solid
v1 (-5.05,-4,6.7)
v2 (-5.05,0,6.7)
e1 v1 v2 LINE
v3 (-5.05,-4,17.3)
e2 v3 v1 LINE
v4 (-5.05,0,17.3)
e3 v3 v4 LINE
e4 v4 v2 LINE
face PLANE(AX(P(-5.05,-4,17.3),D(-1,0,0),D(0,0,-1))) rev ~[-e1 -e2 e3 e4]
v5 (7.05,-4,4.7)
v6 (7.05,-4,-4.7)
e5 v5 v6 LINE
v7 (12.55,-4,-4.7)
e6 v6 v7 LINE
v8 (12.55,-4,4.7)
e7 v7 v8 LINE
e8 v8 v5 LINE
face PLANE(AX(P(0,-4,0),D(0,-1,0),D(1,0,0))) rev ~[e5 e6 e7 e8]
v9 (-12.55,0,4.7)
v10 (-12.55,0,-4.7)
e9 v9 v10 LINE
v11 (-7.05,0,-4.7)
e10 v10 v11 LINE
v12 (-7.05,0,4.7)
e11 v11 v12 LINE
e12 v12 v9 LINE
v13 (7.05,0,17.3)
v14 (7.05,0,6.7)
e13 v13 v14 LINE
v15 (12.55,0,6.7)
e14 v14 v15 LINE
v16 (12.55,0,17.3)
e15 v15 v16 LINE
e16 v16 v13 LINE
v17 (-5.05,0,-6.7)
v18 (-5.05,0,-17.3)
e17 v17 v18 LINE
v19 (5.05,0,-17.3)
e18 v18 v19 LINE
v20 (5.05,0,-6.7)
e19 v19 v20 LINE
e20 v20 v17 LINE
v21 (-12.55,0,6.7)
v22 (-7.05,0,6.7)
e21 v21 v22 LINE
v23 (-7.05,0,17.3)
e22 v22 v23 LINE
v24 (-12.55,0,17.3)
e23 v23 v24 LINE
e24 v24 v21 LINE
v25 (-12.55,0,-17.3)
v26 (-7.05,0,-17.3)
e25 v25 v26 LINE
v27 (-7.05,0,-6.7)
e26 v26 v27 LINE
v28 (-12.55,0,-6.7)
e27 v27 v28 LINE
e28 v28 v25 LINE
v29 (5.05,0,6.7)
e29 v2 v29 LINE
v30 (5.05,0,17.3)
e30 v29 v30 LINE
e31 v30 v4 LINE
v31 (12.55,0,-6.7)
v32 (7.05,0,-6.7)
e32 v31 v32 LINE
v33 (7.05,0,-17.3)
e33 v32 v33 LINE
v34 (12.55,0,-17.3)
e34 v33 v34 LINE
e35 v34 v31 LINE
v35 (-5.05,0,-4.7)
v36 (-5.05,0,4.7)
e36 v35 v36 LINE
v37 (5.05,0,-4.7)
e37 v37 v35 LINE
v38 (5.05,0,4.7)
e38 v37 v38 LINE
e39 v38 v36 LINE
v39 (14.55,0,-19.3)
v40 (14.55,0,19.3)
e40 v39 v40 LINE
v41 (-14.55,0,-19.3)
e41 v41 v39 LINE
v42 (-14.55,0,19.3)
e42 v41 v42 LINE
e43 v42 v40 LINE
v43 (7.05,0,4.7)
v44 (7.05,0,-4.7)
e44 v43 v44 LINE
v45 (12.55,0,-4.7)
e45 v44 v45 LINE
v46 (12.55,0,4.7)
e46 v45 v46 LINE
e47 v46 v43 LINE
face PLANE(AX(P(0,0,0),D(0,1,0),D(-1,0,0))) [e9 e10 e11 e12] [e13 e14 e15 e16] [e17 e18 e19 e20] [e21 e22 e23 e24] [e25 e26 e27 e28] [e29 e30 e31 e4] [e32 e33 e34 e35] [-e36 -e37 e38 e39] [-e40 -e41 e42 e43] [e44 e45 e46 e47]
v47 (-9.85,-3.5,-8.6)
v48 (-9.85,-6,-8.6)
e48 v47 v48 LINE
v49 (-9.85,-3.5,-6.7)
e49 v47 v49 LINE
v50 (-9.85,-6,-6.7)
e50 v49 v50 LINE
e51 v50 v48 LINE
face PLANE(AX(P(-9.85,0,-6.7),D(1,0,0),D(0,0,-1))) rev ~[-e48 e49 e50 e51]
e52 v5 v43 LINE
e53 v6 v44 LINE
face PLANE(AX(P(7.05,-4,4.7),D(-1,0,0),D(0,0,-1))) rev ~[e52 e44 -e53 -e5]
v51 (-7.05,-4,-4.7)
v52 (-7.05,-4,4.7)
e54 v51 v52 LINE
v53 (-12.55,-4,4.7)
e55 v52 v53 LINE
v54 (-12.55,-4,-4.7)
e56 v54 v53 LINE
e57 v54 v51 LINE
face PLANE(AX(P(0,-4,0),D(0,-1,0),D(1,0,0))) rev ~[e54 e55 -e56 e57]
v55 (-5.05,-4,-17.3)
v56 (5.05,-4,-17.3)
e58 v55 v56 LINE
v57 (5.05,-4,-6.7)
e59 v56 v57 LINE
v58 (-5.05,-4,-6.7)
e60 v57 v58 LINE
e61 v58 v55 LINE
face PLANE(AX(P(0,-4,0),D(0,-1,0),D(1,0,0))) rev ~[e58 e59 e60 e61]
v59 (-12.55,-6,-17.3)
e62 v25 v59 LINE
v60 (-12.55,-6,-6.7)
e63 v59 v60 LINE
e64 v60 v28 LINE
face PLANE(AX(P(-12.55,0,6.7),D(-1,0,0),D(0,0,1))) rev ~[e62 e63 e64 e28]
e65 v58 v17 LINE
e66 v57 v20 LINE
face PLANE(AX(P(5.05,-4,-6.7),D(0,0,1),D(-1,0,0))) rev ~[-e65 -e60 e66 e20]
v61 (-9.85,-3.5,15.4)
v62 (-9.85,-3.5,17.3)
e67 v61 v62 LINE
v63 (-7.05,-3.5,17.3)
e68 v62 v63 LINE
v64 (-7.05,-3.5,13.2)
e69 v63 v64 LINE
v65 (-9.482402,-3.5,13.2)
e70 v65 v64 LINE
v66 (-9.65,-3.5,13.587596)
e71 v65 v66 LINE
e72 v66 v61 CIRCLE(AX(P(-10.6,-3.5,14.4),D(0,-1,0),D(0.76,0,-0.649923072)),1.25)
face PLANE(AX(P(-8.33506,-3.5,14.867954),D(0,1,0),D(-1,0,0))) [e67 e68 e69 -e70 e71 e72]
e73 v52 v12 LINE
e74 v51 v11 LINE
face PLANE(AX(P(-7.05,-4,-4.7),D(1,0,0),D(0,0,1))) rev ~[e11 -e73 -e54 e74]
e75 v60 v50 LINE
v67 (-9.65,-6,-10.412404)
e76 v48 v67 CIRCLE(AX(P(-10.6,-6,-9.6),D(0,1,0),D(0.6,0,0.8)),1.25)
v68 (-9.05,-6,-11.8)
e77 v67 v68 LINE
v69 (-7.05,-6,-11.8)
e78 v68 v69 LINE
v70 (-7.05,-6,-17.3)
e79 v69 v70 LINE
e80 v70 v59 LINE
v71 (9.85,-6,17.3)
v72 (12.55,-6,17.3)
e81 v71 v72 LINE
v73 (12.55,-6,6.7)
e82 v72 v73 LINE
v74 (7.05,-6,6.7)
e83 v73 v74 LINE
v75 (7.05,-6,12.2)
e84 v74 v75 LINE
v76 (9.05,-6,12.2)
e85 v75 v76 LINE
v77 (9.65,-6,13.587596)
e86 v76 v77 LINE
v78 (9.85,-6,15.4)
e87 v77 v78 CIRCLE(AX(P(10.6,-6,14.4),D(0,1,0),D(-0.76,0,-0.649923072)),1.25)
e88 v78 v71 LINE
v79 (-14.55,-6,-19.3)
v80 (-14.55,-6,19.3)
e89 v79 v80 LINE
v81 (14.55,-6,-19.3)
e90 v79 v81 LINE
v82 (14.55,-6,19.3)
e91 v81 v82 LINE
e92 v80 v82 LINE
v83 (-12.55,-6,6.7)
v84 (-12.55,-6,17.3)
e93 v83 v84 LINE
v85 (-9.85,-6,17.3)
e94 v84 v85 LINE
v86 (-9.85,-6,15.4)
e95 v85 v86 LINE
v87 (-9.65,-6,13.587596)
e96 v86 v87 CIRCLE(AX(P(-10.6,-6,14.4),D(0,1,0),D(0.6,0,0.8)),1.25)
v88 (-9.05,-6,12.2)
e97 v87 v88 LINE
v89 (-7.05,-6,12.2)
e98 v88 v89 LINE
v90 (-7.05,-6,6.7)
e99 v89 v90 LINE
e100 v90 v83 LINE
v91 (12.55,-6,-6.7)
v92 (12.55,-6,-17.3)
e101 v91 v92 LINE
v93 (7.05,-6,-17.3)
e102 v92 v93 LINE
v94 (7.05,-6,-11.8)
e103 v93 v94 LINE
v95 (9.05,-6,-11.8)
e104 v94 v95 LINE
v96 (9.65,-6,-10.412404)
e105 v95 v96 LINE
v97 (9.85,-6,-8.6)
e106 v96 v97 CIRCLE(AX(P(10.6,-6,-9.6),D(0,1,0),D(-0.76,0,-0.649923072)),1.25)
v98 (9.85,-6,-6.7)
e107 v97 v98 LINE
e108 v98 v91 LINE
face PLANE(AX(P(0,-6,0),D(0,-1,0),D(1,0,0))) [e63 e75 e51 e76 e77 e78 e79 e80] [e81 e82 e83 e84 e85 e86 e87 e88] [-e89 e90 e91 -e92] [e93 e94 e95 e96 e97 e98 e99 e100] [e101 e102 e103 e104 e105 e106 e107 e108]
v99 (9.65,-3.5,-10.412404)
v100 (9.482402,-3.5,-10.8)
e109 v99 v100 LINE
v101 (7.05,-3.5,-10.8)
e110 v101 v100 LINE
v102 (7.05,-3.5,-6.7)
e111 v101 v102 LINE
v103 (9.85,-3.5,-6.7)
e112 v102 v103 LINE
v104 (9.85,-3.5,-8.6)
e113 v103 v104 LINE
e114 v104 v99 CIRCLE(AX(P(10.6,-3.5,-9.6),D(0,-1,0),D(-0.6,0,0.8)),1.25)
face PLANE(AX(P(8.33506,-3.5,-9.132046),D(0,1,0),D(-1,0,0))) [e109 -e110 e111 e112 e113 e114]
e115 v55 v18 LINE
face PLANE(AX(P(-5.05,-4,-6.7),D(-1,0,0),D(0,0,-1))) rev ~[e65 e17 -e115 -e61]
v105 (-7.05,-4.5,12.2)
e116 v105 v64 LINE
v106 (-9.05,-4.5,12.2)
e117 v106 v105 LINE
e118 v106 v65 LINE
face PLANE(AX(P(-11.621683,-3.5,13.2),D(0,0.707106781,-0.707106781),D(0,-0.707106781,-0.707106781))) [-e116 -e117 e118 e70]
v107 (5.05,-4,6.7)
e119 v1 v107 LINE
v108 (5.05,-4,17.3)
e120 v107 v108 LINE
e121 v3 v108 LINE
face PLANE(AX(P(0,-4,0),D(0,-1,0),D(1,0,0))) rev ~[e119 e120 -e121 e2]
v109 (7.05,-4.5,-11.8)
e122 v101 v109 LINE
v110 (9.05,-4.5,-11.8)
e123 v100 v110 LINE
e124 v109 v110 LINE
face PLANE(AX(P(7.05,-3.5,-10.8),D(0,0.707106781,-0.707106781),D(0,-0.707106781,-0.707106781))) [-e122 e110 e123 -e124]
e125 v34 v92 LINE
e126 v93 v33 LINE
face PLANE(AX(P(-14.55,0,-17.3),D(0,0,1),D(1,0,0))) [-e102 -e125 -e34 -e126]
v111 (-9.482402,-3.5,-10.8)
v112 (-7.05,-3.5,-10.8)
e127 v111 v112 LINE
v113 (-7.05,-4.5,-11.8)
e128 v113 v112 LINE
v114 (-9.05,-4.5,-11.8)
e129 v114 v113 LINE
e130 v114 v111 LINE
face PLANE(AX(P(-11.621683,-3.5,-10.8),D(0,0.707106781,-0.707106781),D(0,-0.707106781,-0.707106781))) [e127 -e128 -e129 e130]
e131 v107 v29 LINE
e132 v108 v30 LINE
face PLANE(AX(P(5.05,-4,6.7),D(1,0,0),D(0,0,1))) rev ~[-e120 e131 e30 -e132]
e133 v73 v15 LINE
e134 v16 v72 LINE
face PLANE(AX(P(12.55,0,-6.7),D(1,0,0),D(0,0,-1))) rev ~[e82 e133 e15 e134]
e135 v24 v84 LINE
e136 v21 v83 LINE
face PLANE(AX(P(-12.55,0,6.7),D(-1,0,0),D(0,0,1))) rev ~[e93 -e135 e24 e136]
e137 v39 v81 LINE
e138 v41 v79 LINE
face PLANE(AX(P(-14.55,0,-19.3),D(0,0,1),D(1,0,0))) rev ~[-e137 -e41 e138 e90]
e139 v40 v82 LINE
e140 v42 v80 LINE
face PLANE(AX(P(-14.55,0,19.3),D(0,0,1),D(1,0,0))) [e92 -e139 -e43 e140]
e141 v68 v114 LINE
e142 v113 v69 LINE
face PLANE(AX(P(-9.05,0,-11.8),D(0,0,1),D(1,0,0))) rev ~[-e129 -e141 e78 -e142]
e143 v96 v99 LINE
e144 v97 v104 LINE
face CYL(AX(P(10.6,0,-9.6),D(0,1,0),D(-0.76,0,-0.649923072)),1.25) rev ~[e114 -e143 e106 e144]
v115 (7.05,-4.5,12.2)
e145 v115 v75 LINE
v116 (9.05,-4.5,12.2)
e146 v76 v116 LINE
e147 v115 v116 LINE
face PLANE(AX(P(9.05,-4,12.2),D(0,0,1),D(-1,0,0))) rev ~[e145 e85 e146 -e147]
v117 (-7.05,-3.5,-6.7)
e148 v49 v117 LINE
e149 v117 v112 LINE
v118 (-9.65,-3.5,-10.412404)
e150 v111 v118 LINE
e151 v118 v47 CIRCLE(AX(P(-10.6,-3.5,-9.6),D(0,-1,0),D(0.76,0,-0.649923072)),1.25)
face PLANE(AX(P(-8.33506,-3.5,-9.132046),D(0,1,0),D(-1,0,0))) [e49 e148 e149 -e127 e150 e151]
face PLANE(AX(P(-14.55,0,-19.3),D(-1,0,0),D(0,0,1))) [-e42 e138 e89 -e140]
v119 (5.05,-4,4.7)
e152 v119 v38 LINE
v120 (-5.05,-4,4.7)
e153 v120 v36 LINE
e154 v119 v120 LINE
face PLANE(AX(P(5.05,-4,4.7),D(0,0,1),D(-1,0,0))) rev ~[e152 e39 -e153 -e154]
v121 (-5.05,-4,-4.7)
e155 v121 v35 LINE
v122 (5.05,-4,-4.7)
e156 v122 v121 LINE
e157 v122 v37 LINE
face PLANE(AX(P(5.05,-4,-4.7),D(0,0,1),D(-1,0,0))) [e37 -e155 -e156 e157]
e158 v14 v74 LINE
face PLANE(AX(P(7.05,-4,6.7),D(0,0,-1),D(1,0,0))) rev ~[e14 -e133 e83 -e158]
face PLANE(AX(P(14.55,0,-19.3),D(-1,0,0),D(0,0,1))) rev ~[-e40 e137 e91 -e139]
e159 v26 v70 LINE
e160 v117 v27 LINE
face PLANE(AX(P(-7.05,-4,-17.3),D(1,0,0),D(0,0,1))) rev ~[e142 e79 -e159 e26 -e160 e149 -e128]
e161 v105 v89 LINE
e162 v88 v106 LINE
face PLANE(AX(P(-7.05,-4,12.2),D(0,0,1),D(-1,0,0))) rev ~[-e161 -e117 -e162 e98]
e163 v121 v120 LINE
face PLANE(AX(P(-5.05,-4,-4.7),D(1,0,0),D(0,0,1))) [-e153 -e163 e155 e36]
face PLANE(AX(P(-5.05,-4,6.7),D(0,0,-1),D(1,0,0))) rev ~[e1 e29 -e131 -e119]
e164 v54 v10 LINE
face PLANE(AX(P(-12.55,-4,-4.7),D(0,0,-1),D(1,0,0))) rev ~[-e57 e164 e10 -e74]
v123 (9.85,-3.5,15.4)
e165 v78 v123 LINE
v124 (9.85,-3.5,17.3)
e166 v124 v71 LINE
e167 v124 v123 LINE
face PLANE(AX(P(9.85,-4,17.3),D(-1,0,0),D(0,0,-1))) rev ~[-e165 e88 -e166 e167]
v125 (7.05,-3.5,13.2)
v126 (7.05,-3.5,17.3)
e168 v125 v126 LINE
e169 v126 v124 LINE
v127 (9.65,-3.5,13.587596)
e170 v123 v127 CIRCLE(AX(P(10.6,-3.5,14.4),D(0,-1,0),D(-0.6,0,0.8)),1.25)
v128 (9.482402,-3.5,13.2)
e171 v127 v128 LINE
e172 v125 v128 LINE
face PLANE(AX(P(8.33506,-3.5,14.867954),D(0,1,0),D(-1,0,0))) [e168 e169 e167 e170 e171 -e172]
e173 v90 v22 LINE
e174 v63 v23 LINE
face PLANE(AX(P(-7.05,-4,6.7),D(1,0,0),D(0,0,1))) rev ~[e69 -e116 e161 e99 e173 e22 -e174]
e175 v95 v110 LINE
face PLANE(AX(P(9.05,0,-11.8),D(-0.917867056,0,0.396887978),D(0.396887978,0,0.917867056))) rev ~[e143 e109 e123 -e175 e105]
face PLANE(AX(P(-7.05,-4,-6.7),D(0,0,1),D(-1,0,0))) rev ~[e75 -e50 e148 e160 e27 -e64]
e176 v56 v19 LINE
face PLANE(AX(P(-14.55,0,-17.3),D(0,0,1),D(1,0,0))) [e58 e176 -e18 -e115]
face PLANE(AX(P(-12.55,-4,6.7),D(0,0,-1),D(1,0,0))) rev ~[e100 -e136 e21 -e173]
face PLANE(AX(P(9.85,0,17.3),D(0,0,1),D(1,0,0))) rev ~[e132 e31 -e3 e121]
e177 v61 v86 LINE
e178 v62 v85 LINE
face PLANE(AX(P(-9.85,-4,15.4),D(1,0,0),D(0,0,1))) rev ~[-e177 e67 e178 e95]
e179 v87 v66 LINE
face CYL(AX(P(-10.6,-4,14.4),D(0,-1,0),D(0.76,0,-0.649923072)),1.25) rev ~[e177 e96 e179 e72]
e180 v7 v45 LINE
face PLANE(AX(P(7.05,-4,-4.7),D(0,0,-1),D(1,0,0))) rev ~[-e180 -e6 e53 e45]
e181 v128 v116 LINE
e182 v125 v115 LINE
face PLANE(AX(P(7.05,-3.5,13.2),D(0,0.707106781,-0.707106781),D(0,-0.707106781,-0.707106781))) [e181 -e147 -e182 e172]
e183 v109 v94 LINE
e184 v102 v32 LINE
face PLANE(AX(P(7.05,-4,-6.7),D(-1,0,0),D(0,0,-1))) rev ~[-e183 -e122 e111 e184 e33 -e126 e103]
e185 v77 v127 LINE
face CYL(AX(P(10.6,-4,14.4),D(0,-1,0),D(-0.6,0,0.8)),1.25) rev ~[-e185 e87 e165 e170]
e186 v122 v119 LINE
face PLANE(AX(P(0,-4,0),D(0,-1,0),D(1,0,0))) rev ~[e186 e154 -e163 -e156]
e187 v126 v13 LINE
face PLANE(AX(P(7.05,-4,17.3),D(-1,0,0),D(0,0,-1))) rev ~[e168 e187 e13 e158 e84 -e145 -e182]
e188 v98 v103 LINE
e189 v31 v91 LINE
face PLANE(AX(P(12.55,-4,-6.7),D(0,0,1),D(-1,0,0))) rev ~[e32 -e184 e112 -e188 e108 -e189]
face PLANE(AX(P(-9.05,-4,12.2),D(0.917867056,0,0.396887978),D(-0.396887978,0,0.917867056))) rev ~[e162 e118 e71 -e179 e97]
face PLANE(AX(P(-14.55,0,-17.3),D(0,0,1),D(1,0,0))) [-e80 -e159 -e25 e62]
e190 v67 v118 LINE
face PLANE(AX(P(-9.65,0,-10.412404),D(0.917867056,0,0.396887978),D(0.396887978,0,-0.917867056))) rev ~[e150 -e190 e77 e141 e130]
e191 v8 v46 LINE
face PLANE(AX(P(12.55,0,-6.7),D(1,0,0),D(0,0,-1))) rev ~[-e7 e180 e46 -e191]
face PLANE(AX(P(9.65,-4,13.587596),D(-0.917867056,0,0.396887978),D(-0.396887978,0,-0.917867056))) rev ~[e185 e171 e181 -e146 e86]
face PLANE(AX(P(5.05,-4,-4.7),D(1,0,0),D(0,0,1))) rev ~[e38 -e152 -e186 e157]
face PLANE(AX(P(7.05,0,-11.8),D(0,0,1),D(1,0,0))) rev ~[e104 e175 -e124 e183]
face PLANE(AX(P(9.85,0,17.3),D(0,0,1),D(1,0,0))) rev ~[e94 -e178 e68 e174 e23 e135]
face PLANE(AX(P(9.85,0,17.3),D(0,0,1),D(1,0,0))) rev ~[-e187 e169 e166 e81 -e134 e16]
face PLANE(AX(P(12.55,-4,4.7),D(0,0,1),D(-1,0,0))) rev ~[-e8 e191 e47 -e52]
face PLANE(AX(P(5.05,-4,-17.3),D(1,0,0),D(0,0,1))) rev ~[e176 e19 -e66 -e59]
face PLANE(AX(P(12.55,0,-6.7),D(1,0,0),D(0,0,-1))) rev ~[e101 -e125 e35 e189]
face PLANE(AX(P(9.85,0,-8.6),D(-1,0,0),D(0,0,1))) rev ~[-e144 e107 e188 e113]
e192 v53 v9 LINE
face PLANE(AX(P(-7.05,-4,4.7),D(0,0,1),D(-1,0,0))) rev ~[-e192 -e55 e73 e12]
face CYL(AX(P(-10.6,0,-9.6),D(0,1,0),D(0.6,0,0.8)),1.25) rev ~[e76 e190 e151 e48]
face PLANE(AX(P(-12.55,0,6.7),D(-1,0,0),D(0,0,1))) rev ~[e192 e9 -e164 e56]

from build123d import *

# Parameters (mm, degrees)
F3_W        = 29.1
F3_H        = 38.6
F4_DEPTH    = 6
F5_T        = 2
F7_DEPTH    = 0.5
F8_T1_DEPTH = 4.571682988
F8_T3_DEPTH = 4.571682988
F9_W        = 10.1
F9_H        = 9.4
F10_DEPTH   = 4


# Not quite as in the source:
# - a fillet or chamfer that OpenCascade refuses, or shapes differently, is made with other operations: its cross-section is extruded or revolved along the edge and cut away or added
# - a feature of the source that left no trace in its solid (it failed there, or was rolled back) is left out
# - a shell that OpenCascade refuses in one call is made with other operations: the cavity is built on its own and cut out


with BuildPart() as f4:
    # F3 (on Front) → F4 (new body)
    with BuildSketch(Plane.XZ):
        Rectangle(F3_W, F3_H)
        with BuildLine():
            Line((-12.55, -17.3), (-12.55, -6.7))
            Line((-12.55, -6.7), (-9.85, -6.7))
            Line((-9.85, -6.7), (-9.85, -8.6))
            ThreePointArc((-9.85, -8.6), (-9.3575419845, -9.4628939105), (-9.65, -10.4124038405))
            Line((-9.65, -10.4124038405), (-9.05, -11.8))
            Line((-9.05, -11.8), (-7.05, -11.8))
            Line((-7.05, -11.8), (-7.05, -17.3))
            Line((-7.05, -17.3), (-12.55, -17.3))
        make_face(mode=Mode.SUBTRACT)
        with BuildLine():
            Line((12.55, -6.7), (12.55, -17.3))
            Line((12.55, -17.3), (7.05, -17.3))
            Line((7.05, -17.3), (7.05, -11.8))
            Line((7.05, -11.8), (9.05, -11.8))
            Line((9.05, -11.8), (9.65, -10.4124038405))
            ThreePointArc((9.65, -10.4124038405), (9.3575419845, -9.4628939105), (9.85, -8.6))
            Line((9.85, -8.6), (9.85, -6.7))
            Line((9.85, -6.7), (12.55, -6.7))
        make_face(mode=Mode.SUBTRACT)
        with BuildLine():
            Line((-12.55, 6.7), (-12.55, 17.3))
            Line((-12.55, 17.3), (-9.85, 17.3))
            Line((-9.85, 17.3), (-9.85, 15.4))
            ThreePointArc((-9.85, 15.4), (-9.3575419845, 14.5371060895), (-9.65, 13.5875961595))
            Line((-9.65, 13.5875961595), (-9.05, 12.2))
            Line((-9.05, 12.2), (-7.05, 12.2))
            Line((-7.05, 12.2), (-7.05, 6.7))
            Line((-7.05, 6.7), (-12.55, 6.7))
        make_face(mode=Mode.SUBTRACT)
        with BuildLine():
            Line((7.05, 6.7), (7.05, 12.2))
            Line((7.05, 12.2), (9.05, 12.2))
            Line((9.05, 12.2), (9.65, 13.5875961595))
            ThreePointArc((9.65, 13.5875961595), (9.3575419845, 14.5371060895), (9.85, 15.4))
            Line((9.85, 15.4), (9.85, 17.3))
            Line((9.85, 17.3), (12.55, 17.3))
            Line((12.55, 17.3), (12.55, 6.7))
            Line((12.55, 6.7), (7.05, 6.7))
        make_face(mode=Mode.SUBTRACT)
    extrude(amount=F4_DEPTH)

    # F5: shell of thickness 2, made by hand


with BuildPart() as f5_core1:
    # F5_t2: copy of F4
    add(f4.part)

    # the walls: a layer under each face that stays
    f5_faces = [f5_core1.faces().sort_by_distance(p)[0] for p in [
        (14.55, -3, 0),
        (0, -3, 19.3),
        (-14.55, -3, 0),
        (0, -3, -19.3),
        (0, -6, 0),
    ]]
    thicken(f5_faces, amount=-F5_T, mode=Mode.SUBTRACT)


with BuildPart() as f4_1:
    add(f4.part)

    # what is left inside the walls is the cavity
    f5_cavity = [f5_core1.part.solids().sort_by_distance(p)[0] for p in [
        (0, -0.02, -5.766667),
    ]]
    add(f5_cavity, mode=Mode.SUBTRACT)

    # F6 (on face) → F7 (join)
    with BuildSketch(Plane(origin=(0, -4, 0), x_dir=(-1, 0, 0), z_dir=(0, 1, 0))):
        with BuildLine():
            Line((-7.05, 17.3), (-9.85, 17.3))
            Line((-9.85, 17.3), (-9.85, 15.4))
            ThreePointArc((-9.85, 15.4), (-9.3575419845, 14.5371060895), (-9.65, 13.5875961595))
            Line((-9.65, 13.5875961595), (-9.05, 12.2))
            Line((-9.05, 12.2), (-7.05, 12.2))
            Line((-7.05, 12.2), (-7.05, 17.3))
        make_face()
        with BuildLine():
            Line((9.85, 17.3), (7.05, 17.3))
            Line((7.05, 17.3), (7.05, 12.2))
            Line((7.05, 12.2), (9.05, 12.2))
            Line((9.05, 12.2), (9.65, 13.5875961595))
            ThreePointArc((9.65, 13.5875961595), (9.3575419845, 14.5371060895), (9.85, 15.4))
            Line((9.85, 15.4), (9.85, 17.3))
        make_face()
        with BuildLine():
            Line((-9.65, -10.4124038405), (-9.05, -11.8))
            Line((-9.05, -11.8), (-7.05, -11.8))
            Line((-7.05, -11.8), (-7.05, -6.7))
            Line((-7.05, -6.7), (-9.85, -6.7))
            Line((-9.85, -6.7), (-9.85, -8.6))
            ThreePointArc((-9.85, -8.6), (-9.3575419845, -9.4628939105), (-9.65, -10.4124038405))
        make_face()
        with BuildLine():
            Line((9.85, -6.7), (7.05, -6.7))
            Line((7.05, -6.7), (7.05, -11.8))
            Line((7.05, -11.8), (9.05, -11.8))
            Line((9.05, -11.8), (9.65, -10.4124038405))
            ThreePointArc((9.65, -10.4124038405), (9.3575419845, -9.4628939105), (9.85, -8.6))
            Line((9.85, -8.6), (9.85, -6.7))
        make_face()
    extrude(amount=F7_DEPTH)

    # F8: chamfer of 1 on 4 edges, made by hand

    # F8_s2 → F8_t1 (cut)
    with BuildSketch(Plane.YZ.offset(7.05)):
        Polygon((-3.5, -10.8), (-4.5, -11.8), (-3.5, -11.8), align=None)
        Polygon((-3.5, 13.2), (-4.5, 12.2), (-3.5, 12.2), align=None)
    extrude(amount=F8_T1_DEPTH, mode=Mode.SUBTRACT)

    # F8_s4 → F8_t3 (cut)
    with BuildSketch(Plane.YZ.offset(-11.621682988)):
        Polygon((-3.5, -10.8), (-4.5, -11.8), (-3.5, -11.8), align=None)
        Polygon((-3.5, 13.2), (-4.5, 12.2), (-3.5, 12.2), align=None)
    extrude(amount=F8_T3_DEPTH, mode=Mode.SUBTRACT)

    # F9 (on face) → F10 (join, through all)
    with BuildSketch(Plane(origin=(0, -4, 0), x_dir=(-1, 0, 0), z_dir=(0, 1, 0))):
        Polygon((7.05, -17.3), (7.05, -11.3), (7.05, -6.7), (9.85, -6.7), (12.55, -6.7), (12.55, -4.7), (7.05, -4.7), (7.05, 4.7), (12.55, 4.7), (12.55, 6.7), (7.05, 6.7), (7.05, 12.7), (7.05, 17.3), (5.05, 17.3), (5.05, 6.7), (-5.05, 6.7), (-5.05, 17.3), (-7.05, 17.3), (-7.05, 12.7), (-7.05, 6.7), (-12.55, 6.7), (-12.55, 4.7), (-7.05, 4.7), (-7.05, -4.7), (-12.55, -4.7), (-12.55, -6.7), (-9.85, -6.7), (-7.05, -6.7), (-7.05, -11.3), (-7.05, -17.3), (-5.05, -17.3), (-5.05, -6.7), (5.05, -6.7), (5.05, -17.3), align=None)
        Rectangle(F9_W, F9_H, mode=Mode.SUBTRACT)
    extrude(amount=F10_DEPTH)


solid = f4_1.part
